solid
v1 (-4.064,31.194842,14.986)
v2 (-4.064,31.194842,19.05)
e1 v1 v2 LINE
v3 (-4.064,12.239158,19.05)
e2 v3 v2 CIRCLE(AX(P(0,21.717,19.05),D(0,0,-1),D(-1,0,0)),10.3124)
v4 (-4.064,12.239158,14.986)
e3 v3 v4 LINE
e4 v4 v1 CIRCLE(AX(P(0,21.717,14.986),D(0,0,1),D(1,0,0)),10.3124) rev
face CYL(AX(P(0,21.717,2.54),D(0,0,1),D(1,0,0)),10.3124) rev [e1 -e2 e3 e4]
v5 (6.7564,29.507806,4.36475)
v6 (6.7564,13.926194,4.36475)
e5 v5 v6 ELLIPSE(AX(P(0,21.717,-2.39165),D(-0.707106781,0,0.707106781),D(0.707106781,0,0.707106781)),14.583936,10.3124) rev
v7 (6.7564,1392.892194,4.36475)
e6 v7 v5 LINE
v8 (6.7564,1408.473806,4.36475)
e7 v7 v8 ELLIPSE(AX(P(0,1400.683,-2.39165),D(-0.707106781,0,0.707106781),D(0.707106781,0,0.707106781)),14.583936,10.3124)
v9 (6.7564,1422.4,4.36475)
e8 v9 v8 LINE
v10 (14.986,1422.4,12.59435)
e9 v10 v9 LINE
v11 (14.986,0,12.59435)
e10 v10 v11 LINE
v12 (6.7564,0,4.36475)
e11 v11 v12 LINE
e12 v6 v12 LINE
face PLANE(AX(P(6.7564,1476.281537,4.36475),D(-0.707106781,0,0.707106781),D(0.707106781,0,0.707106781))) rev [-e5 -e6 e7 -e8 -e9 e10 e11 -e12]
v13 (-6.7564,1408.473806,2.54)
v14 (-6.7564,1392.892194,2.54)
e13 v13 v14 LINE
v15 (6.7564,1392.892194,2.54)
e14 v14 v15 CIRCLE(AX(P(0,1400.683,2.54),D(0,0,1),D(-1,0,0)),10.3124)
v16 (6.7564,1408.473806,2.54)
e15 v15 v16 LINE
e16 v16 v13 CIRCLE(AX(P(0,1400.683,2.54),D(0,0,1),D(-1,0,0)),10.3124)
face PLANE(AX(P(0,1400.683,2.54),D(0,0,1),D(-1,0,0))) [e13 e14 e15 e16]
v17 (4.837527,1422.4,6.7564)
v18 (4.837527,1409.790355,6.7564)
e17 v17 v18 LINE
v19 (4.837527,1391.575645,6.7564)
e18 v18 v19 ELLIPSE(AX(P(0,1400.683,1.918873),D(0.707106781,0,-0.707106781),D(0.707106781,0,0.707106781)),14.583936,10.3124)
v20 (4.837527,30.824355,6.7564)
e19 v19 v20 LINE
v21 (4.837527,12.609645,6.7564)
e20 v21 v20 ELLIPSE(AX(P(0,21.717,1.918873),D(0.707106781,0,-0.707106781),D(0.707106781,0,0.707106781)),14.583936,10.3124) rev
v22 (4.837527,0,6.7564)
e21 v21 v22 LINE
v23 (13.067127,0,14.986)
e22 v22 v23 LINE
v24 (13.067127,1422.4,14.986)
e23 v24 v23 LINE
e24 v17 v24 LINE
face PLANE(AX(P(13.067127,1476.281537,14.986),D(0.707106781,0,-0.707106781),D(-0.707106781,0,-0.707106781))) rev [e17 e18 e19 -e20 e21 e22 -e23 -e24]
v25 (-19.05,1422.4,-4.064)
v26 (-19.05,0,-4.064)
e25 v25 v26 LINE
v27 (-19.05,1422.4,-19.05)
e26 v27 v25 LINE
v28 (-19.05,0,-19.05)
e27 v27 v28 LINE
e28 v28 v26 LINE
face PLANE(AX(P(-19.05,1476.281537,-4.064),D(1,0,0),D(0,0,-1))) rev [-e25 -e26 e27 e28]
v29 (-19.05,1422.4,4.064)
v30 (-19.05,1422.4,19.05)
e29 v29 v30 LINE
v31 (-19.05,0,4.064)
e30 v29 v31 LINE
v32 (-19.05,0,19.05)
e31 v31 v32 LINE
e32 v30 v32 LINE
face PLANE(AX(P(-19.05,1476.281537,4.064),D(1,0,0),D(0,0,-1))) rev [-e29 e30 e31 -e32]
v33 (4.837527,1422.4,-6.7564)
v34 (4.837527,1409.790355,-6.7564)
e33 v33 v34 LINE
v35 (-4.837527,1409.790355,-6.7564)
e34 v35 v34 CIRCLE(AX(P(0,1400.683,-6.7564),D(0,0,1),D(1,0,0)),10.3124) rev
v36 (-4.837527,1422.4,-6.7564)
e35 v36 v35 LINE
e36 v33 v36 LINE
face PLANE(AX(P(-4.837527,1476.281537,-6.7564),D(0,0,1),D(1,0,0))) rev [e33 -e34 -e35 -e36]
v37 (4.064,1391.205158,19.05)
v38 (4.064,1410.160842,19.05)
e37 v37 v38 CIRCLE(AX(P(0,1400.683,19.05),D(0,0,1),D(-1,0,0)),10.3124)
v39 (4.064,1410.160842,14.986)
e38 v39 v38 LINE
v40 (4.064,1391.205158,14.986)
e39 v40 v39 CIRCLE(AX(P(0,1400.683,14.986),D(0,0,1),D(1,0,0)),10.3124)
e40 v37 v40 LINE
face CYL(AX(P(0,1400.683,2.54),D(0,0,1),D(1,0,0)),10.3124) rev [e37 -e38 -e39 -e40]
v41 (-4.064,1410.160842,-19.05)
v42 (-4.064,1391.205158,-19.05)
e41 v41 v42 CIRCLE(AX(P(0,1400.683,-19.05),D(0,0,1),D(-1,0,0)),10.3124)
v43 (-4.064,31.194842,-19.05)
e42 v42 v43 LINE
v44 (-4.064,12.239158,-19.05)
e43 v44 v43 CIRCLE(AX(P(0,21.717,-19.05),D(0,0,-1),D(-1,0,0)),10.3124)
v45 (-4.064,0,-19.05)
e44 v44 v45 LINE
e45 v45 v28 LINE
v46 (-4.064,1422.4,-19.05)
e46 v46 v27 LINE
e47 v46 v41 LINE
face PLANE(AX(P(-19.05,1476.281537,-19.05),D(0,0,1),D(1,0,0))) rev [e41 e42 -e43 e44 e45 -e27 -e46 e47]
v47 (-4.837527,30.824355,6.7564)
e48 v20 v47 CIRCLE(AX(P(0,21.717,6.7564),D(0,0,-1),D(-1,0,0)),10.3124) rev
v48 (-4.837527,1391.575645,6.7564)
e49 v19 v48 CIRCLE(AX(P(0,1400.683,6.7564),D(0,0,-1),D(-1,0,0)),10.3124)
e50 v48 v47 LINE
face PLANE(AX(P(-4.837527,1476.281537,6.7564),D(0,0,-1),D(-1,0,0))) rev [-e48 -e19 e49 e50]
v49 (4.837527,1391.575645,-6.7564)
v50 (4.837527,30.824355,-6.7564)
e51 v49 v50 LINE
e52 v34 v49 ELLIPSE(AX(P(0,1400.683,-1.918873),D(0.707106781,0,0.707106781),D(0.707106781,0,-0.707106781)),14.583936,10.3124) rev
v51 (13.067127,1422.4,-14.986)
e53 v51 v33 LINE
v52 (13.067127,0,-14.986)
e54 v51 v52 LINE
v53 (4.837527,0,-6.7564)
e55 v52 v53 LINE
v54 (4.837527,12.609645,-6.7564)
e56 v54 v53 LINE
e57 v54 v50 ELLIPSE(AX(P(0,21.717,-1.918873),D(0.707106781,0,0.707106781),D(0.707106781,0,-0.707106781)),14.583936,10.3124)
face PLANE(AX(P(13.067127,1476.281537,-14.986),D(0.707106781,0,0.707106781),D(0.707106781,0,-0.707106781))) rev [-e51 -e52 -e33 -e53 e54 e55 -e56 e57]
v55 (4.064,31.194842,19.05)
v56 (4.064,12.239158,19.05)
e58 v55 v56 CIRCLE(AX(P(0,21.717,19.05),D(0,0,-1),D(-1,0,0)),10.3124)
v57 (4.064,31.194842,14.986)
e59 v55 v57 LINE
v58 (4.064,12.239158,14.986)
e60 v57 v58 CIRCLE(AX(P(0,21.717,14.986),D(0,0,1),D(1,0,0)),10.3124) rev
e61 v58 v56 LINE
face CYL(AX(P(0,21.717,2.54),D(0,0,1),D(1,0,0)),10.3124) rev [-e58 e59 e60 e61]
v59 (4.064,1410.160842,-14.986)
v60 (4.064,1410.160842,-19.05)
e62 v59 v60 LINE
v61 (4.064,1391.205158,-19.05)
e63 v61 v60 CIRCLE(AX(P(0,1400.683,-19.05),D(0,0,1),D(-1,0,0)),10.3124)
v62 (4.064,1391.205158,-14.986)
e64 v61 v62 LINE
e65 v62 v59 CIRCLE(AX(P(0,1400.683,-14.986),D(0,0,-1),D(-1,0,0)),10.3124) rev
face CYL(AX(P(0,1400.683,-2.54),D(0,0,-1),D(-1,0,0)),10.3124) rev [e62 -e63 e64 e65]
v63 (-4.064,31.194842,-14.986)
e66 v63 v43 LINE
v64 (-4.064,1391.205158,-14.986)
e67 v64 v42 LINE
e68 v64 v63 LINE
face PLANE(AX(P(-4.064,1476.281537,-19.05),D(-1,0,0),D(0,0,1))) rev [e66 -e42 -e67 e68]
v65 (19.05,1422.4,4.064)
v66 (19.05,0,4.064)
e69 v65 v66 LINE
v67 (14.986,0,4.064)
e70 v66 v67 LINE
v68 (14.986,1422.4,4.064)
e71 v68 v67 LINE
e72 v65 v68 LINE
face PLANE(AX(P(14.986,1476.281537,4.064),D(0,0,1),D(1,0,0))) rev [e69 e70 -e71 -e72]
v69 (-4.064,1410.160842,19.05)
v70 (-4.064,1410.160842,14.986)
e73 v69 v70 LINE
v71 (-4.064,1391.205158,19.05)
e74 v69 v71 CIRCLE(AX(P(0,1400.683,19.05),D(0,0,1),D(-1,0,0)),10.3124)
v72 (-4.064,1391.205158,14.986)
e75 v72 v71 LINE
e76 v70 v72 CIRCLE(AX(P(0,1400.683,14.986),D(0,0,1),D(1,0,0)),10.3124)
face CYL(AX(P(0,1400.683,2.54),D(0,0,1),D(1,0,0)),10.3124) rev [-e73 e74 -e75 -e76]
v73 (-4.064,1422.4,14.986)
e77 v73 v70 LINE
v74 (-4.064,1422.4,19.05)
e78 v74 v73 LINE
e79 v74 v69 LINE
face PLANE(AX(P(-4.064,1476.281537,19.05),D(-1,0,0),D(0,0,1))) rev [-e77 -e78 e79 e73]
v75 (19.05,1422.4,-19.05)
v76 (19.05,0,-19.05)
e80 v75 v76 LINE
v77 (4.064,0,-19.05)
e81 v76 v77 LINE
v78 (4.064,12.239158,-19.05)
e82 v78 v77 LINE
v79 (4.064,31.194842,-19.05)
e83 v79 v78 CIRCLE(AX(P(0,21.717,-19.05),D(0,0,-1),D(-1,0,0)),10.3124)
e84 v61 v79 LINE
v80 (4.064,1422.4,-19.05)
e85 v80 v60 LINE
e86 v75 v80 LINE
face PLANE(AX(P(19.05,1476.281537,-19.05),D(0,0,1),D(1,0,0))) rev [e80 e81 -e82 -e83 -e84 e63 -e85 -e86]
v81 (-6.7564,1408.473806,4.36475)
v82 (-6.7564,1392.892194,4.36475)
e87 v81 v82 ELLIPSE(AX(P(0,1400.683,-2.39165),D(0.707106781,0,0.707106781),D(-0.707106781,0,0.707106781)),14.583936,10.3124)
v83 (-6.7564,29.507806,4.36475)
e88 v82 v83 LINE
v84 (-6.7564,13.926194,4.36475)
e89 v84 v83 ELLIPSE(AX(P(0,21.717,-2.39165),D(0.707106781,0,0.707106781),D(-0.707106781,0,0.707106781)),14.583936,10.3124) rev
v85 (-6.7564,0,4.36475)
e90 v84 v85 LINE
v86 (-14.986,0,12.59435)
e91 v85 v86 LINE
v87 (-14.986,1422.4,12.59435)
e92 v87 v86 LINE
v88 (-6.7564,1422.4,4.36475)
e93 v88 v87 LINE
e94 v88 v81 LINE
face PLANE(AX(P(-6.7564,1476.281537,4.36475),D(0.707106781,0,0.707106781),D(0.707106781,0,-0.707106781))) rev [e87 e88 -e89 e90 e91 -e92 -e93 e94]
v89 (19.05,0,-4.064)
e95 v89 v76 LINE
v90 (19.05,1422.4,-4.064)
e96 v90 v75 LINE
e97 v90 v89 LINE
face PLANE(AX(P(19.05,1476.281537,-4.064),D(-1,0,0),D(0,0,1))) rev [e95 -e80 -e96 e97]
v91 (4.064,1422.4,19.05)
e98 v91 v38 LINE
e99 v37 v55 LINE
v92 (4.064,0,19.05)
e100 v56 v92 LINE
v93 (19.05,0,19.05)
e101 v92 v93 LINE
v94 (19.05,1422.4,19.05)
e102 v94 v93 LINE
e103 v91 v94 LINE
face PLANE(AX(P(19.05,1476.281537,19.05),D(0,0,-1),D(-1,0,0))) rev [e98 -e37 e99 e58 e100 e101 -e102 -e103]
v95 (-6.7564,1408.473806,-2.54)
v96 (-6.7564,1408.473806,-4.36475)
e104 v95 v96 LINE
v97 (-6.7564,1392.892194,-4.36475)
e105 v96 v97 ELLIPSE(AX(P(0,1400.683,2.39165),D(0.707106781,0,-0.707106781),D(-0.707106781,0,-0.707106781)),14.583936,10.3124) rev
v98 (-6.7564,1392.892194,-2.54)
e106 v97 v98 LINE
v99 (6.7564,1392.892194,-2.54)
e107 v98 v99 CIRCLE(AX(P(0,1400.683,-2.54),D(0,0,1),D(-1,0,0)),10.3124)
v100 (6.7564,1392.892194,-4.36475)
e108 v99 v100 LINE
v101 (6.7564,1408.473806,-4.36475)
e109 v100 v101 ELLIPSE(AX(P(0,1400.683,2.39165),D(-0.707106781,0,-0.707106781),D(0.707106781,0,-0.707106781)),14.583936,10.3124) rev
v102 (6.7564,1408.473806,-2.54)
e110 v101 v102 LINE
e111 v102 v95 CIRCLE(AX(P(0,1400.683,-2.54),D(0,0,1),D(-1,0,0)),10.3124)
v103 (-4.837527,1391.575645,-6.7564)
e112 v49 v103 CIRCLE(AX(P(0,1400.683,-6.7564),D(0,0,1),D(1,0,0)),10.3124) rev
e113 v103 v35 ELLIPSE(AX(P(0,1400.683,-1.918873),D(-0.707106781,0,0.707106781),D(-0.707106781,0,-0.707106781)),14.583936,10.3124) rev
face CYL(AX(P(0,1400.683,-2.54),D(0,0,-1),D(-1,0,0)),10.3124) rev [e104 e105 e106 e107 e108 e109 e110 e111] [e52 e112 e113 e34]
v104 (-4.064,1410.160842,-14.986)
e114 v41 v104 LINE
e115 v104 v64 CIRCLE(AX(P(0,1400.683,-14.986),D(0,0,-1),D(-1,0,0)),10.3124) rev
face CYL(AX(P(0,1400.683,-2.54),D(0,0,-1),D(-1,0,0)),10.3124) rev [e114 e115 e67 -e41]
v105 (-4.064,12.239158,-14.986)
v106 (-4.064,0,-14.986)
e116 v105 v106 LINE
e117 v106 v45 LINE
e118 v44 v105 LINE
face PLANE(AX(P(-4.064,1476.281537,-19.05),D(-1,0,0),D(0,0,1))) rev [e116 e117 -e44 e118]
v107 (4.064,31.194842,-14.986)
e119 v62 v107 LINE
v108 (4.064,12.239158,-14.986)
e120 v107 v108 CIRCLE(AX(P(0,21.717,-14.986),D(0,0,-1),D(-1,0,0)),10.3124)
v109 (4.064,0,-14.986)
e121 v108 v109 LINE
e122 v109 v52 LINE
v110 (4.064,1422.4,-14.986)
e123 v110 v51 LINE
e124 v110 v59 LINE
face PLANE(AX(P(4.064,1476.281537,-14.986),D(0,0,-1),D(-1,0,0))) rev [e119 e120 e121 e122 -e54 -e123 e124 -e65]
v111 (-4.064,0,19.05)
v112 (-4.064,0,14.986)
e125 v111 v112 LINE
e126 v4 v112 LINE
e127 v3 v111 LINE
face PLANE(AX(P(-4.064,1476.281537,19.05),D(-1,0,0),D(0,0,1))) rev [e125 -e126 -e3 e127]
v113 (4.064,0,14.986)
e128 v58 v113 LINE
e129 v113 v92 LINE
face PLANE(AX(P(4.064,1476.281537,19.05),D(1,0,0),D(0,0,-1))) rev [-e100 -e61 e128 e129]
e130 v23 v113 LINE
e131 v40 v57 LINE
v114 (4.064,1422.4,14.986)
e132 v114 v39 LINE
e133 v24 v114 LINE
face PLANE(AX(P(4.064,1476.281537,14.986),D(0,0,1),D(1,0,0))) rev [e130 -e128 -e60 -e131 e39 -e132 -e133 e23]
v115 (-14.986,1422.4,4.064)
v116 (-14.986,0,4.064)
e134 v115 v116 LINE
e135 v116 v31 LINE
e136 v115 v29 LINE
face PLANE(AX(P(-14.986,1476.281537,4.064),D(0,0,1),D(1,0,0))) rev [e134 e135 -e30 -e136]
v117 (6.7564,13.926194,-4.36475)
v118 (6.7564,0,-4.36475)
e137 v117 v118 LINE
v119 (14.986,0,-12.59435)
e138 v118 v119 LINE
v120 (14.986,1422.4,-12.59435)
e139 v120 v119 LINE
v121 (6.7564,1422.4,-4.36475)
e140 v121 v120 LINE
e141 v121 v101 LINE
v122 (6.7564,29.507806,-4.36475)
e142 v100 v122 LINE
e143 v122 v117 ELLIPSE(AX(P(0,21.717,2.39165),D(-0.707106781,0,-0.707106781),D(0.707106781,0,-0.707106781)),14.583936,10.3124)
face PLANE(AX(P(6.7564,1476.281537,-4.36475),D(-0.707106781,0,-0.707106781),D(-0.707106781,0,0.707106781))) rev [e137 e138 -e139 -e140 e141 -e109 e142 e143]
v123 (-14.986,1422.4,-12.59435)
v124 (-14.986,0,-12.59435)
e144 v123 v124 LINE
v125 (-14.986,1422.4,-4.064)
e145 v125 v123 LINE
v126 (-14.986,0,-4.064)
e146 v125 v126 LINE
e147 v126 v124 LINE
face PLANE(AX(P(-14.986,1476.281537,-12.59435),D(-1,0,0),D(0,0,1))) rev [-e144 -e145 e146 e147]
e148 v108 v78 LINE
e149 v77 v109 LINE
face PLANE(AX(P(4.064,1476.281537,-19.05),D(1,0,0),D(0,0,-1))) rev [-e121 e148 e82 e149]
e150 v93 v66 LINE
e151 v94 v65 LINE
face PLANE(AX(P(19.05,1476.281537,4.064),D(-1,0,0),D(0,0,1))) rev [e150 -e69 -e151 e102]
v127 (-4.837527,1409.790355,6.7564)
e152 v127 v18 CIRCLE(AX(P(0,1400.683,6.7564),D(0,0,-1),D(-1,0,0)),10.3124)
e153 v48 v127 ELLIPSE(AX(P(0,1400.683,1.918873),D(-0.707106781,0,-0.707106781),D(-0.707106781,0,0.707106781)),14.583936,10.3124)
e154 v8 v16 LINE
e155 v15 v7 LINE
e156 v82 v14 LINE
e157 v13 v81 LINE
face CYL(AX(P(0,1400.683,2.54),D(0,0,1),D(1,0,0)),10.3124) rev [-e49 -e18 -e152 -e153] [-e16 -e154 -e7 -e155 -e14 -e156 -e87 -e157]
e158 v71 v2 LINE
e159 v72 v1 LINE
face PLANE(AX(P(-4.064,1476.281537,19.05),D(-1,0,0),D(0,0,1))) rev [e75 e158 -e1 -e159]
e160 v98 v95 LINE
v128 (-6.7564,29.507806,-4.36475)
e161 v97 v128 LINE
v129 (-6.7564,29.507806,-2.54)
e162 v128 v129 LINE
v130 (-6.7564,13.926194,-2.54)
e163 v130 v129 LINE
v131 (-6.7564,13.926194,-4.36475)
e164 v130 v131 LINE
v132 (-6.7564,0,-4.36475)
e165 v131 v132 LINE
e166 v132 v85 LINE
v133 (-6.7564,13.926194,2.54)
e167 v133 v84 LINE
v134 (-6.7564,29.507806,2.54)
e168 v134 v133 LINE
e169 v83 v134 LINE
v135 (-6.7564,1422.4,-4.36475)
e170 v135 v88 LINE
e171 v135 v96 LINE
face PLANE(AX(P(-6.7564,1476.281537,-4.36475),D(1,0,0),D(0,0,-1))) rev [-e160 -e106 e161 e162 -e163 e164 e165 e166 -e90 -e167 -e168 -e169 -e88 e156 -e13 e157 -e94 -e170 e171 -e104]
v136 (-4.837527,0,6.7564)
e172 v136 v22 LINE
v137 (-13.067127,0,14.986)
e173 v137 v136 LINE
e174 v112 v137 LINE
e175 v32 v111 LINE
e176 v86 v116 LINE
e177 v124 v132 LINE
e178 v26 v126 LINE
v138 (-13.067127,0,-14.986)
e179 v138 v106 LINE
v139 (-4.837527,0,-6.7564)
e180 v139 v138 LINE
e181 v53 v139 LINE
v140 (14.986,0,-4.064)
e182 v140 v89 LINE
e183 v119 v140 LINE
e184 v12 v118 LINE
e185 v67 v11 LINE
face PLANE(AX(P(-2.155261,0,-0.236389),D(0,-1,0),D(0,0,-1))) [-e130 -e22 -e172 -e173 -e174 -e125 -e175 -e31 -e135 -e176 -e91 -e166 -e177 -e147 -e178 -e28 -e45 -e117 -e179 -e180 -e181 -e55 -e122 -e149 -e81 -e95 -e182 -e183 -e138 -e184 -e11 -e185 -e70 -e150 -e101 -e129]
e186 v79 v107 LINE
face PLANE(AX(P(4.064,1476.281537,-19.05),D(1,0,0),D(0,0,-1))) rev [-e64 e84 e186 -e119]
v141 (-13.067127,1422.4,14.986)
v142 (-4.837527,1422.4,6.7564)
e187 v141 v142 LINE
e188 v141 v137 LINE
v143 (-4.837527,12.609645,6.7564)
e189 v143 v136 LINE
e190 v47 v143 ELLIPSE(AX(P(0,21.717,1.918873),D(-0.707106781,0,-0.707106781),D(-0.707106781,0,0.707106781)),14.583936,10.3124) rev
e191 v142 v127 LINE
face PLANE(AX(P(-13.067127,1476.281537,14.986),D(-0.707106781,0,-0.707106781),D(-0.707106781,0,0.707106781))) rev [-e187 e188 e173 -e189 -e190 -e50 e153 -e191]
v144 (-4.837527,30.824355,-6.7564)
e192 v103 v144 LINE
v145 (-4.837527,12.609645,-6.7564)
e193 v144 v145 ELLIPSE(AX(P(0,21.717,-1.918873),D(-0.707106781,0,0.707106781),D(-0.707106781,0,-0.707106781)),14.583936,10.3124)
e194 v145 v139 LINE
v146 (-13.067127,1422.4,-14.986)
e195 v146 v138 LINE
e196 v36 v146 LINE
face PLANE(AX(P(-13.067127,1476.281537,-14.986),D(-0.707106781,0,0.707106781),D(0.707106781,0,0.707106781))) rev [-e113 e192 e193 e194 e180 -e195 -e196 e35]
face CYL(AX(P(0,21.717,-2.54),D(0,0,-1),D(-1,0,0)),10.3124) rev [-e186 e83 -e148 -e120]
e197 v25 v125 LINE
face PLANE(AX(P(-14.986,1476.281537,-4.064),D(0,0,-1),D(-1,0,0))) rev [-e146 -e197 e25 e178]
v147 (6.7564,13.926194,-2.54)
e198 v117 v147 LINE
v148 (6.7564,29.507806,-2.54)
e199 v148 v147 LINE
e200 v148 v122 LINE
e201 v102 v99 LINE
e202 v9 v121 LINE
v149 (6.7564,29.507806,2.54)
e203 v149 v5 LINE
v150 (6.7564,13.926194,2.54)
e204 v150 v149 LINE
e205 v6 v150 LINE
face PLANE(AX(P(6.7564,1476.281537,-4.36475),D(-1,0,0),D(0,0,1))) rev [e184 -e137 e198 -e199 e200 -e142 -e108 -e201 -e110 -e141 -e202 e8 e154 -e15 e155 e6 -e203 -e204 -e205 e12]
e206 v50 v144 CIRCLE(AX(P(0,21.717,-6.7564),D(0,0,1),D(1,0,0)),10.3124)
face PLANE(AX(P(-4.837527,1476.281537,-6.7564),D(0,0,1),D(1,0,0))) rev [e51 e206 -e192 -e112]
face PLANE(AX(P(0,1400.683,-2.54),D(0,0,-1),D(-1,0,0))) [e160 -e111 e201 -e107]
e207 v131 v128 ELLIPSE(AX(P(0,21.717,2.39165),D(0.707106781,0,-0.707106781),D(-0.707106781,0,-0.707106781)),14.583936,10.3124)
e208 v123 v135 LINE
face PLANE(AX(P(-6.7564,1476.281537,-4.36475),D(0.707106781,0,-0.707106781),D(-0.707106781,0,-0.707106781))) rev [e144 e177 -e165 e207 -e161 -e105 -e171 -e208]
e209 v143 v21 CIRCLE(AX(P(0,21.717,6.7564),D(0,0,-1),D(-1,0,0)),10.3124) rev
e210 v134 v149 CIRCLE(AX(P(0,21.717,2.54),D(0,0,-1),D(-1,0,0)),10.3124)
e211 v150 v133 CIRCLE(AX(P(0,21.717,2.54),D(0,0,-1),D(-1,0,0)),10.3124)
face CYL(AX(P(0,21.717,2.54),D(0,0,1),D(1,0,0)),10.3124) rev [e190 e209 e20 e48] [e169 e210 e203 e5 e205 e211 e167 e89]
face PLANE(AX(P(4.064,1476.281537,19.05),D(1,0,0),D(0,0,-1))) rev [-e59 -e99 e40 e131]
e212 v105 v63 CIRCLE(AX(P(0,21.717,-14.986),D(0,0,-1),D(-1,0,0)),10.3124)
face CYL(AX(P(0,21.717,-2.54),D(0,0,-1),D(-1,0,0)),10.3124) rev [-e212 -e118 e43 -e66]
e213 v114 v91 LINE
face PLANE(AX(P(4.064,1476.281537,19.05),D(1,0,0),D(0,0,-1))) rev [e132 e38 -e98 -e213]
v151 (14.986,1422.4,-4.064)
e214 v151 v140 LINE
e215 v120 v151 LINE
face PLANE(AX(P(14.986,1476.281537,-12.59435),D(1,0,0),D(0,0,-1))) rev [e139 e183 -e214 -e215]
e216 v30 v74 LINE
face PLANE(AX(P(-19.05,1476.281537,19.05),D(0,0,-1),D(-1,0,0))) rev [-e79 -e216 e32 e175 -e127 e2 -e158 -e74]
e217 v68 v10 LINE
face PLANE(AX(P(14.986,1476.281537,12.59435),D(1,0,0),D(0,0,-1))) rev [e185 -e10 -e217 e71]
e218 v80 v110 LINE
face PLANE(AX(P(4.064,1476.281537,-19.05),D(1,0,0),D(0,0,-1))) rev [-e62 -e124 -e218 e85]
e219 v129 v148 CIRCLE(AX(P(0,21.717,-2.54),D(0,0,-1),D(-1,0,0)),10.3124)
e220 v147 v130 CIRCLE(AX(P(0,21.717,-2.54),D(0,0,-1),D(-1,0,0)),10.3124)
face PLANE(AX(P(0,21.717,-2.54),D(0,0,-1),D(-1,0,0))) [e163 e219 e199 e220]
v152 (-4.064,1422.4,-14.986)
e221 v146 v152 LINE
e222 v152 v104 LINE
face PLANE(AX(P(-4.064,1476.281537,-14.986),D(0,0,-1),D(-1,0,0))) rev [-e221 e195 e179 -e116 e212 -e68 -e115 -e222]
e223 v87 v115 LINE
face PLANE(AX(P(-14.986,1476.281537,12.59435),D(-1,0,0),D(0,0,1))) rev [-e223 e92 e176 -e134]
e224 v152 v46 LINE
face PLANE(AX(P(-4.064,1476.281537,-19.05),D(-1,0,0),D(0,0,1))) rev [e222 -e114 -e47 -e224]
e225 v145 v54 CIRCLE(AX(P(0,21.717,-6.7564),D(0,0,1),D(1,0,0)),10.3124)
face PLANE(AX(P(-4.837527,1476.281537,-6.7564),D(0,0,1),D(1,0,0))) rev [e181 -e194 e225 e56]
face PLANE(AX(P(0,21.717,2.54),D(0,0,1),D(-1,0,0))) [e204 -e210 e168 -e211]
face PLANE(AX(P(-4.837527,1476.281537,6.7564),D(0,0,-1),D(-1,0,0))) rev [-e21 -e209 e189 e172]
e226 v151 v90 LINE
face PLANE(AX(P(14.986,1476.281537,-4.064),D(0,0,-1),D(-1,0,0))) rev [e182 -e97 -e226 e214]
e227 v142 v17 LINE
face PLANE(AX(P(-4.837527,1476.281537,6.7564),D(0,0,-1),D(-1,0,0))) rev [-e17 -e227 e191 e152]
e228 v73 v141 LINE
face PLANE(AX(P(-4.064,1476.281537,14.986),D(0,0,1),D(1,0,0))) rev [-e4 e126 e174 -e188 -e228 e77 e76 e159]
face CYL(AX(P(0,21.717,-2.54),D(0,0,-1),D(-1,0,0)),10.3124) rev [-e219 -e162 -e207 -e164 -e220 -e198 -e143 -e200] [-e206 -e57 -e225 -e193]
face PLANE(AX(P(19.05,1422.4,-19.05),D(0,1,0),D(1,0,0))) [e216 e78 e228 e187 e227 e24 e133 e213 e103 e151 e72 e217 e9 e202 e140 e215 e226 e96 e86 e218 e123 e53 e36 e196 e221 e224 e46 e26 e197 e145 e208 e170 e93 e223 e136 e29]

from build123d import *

# Parameters (mm, degrees)
EXTRUDE1_DEPTH          = 1422.4
SKETCH2_R               = 10.3124
CUT_EXTRUDE1_DEPTH      = 16.51
MIRROR2_COPY_1_SKETCH_R = 10.3124
MIRROR2_COPY_1_DEPTH    = 16.51


# Read off the part's stored shape, not the designer's step: 1515<1>
with BuildPart() as part:
    # Sketch1<2> → Extrude1 (new body)
    with BuildSketch(Plane(origin=(0, 0, 0), x_dir=(1, 0, 0), z_dir=(0, 1, 0))):
        Polygon((-6.7564, 4.364749804), (-6.7564, -4.364749804), (-14.986, -12.594349804), (-14.986, -4.064), (-19.05, -4.064), (-19.05, -19.05), (-4.064, -19.05), (-4.064, -14.986), (-13.067127258, -14.986), (-4.837527258, -6.7564), (4.837527258, -6.7564), (13.067127258, -14.986), (4.064, -14.986), (4.064, -19.05), (19.05, -19.05), (19.05, -4.064), (14.986, -4.064), (14.986, -12.594349804), (6.7564, -4.364749804), (6.7564, 4.364749804), (14.986, 12.594349804), (14.986, 4.064), (19.05, 4.064), (19.05, 19.05), (4.064, 19.05), (4.064, 14.986), (13.067127258, 14.986), (4.837527258, 6.7564), (-4.837527258, 6.7564), (-13.067127258, 14.986), (-4.064, 14.986), (-4.064, 19.05), (-19.05, 19.05), (-19.05, 4.064), (-14.986, 4.064), (-14.986, 12.594349804), align=None)
    extrude(amount=EXTRUDE1_DEPTH)

    # Sketch2 → Cut-Extrude1 (cut)
    with BuildSketch(Plane(origin=(0, 0, -19.05), x_dir=(-1, 0, 0), z_dir=(0, 0, -1))):
        with Locations(Location((0, 21.717, 0), (0, 0, 310.932724574))):
            Circle(SKETCH2_R)
    cut_extrude1 = extrude(amount=-CUT_EXTRUDE1_DEPTH, mode=Mode.SUBTRACT)

    # Mirror1: Cut-Extrude1 across plane
    add(cut_extrude1.mirror(Plane.XY), mode=Mode.SUBTRACT)

    # Mirror2: Cut-Extrude1 across plane
    add(cut_extrude1.mirror(Plane(origin=(0, 711.2, 0), x_dir=(0, 0, 1), z_dir=(0, -1, 0))), mode=Mode.SUBTRACT)

    # Mirror2 copy 1 sketch → Mirror2 copy 1 (cut)
    with BuildSketch(Plane(origin=(0, 1422.4, 19.05), x_dir=(-1, 0, 0), z_dir=(0, 0, 1))):
        with Locations(Location((0, 21.717, 0), (0, 0, 310.932724574))):
            Circle(MIRROR2_COPY_1_SKETCH_R)
    extrude(amount=-MIRROR2_COPY_1_DEPTH, mode=Mode.SUBTRACT)


solid = part.part
